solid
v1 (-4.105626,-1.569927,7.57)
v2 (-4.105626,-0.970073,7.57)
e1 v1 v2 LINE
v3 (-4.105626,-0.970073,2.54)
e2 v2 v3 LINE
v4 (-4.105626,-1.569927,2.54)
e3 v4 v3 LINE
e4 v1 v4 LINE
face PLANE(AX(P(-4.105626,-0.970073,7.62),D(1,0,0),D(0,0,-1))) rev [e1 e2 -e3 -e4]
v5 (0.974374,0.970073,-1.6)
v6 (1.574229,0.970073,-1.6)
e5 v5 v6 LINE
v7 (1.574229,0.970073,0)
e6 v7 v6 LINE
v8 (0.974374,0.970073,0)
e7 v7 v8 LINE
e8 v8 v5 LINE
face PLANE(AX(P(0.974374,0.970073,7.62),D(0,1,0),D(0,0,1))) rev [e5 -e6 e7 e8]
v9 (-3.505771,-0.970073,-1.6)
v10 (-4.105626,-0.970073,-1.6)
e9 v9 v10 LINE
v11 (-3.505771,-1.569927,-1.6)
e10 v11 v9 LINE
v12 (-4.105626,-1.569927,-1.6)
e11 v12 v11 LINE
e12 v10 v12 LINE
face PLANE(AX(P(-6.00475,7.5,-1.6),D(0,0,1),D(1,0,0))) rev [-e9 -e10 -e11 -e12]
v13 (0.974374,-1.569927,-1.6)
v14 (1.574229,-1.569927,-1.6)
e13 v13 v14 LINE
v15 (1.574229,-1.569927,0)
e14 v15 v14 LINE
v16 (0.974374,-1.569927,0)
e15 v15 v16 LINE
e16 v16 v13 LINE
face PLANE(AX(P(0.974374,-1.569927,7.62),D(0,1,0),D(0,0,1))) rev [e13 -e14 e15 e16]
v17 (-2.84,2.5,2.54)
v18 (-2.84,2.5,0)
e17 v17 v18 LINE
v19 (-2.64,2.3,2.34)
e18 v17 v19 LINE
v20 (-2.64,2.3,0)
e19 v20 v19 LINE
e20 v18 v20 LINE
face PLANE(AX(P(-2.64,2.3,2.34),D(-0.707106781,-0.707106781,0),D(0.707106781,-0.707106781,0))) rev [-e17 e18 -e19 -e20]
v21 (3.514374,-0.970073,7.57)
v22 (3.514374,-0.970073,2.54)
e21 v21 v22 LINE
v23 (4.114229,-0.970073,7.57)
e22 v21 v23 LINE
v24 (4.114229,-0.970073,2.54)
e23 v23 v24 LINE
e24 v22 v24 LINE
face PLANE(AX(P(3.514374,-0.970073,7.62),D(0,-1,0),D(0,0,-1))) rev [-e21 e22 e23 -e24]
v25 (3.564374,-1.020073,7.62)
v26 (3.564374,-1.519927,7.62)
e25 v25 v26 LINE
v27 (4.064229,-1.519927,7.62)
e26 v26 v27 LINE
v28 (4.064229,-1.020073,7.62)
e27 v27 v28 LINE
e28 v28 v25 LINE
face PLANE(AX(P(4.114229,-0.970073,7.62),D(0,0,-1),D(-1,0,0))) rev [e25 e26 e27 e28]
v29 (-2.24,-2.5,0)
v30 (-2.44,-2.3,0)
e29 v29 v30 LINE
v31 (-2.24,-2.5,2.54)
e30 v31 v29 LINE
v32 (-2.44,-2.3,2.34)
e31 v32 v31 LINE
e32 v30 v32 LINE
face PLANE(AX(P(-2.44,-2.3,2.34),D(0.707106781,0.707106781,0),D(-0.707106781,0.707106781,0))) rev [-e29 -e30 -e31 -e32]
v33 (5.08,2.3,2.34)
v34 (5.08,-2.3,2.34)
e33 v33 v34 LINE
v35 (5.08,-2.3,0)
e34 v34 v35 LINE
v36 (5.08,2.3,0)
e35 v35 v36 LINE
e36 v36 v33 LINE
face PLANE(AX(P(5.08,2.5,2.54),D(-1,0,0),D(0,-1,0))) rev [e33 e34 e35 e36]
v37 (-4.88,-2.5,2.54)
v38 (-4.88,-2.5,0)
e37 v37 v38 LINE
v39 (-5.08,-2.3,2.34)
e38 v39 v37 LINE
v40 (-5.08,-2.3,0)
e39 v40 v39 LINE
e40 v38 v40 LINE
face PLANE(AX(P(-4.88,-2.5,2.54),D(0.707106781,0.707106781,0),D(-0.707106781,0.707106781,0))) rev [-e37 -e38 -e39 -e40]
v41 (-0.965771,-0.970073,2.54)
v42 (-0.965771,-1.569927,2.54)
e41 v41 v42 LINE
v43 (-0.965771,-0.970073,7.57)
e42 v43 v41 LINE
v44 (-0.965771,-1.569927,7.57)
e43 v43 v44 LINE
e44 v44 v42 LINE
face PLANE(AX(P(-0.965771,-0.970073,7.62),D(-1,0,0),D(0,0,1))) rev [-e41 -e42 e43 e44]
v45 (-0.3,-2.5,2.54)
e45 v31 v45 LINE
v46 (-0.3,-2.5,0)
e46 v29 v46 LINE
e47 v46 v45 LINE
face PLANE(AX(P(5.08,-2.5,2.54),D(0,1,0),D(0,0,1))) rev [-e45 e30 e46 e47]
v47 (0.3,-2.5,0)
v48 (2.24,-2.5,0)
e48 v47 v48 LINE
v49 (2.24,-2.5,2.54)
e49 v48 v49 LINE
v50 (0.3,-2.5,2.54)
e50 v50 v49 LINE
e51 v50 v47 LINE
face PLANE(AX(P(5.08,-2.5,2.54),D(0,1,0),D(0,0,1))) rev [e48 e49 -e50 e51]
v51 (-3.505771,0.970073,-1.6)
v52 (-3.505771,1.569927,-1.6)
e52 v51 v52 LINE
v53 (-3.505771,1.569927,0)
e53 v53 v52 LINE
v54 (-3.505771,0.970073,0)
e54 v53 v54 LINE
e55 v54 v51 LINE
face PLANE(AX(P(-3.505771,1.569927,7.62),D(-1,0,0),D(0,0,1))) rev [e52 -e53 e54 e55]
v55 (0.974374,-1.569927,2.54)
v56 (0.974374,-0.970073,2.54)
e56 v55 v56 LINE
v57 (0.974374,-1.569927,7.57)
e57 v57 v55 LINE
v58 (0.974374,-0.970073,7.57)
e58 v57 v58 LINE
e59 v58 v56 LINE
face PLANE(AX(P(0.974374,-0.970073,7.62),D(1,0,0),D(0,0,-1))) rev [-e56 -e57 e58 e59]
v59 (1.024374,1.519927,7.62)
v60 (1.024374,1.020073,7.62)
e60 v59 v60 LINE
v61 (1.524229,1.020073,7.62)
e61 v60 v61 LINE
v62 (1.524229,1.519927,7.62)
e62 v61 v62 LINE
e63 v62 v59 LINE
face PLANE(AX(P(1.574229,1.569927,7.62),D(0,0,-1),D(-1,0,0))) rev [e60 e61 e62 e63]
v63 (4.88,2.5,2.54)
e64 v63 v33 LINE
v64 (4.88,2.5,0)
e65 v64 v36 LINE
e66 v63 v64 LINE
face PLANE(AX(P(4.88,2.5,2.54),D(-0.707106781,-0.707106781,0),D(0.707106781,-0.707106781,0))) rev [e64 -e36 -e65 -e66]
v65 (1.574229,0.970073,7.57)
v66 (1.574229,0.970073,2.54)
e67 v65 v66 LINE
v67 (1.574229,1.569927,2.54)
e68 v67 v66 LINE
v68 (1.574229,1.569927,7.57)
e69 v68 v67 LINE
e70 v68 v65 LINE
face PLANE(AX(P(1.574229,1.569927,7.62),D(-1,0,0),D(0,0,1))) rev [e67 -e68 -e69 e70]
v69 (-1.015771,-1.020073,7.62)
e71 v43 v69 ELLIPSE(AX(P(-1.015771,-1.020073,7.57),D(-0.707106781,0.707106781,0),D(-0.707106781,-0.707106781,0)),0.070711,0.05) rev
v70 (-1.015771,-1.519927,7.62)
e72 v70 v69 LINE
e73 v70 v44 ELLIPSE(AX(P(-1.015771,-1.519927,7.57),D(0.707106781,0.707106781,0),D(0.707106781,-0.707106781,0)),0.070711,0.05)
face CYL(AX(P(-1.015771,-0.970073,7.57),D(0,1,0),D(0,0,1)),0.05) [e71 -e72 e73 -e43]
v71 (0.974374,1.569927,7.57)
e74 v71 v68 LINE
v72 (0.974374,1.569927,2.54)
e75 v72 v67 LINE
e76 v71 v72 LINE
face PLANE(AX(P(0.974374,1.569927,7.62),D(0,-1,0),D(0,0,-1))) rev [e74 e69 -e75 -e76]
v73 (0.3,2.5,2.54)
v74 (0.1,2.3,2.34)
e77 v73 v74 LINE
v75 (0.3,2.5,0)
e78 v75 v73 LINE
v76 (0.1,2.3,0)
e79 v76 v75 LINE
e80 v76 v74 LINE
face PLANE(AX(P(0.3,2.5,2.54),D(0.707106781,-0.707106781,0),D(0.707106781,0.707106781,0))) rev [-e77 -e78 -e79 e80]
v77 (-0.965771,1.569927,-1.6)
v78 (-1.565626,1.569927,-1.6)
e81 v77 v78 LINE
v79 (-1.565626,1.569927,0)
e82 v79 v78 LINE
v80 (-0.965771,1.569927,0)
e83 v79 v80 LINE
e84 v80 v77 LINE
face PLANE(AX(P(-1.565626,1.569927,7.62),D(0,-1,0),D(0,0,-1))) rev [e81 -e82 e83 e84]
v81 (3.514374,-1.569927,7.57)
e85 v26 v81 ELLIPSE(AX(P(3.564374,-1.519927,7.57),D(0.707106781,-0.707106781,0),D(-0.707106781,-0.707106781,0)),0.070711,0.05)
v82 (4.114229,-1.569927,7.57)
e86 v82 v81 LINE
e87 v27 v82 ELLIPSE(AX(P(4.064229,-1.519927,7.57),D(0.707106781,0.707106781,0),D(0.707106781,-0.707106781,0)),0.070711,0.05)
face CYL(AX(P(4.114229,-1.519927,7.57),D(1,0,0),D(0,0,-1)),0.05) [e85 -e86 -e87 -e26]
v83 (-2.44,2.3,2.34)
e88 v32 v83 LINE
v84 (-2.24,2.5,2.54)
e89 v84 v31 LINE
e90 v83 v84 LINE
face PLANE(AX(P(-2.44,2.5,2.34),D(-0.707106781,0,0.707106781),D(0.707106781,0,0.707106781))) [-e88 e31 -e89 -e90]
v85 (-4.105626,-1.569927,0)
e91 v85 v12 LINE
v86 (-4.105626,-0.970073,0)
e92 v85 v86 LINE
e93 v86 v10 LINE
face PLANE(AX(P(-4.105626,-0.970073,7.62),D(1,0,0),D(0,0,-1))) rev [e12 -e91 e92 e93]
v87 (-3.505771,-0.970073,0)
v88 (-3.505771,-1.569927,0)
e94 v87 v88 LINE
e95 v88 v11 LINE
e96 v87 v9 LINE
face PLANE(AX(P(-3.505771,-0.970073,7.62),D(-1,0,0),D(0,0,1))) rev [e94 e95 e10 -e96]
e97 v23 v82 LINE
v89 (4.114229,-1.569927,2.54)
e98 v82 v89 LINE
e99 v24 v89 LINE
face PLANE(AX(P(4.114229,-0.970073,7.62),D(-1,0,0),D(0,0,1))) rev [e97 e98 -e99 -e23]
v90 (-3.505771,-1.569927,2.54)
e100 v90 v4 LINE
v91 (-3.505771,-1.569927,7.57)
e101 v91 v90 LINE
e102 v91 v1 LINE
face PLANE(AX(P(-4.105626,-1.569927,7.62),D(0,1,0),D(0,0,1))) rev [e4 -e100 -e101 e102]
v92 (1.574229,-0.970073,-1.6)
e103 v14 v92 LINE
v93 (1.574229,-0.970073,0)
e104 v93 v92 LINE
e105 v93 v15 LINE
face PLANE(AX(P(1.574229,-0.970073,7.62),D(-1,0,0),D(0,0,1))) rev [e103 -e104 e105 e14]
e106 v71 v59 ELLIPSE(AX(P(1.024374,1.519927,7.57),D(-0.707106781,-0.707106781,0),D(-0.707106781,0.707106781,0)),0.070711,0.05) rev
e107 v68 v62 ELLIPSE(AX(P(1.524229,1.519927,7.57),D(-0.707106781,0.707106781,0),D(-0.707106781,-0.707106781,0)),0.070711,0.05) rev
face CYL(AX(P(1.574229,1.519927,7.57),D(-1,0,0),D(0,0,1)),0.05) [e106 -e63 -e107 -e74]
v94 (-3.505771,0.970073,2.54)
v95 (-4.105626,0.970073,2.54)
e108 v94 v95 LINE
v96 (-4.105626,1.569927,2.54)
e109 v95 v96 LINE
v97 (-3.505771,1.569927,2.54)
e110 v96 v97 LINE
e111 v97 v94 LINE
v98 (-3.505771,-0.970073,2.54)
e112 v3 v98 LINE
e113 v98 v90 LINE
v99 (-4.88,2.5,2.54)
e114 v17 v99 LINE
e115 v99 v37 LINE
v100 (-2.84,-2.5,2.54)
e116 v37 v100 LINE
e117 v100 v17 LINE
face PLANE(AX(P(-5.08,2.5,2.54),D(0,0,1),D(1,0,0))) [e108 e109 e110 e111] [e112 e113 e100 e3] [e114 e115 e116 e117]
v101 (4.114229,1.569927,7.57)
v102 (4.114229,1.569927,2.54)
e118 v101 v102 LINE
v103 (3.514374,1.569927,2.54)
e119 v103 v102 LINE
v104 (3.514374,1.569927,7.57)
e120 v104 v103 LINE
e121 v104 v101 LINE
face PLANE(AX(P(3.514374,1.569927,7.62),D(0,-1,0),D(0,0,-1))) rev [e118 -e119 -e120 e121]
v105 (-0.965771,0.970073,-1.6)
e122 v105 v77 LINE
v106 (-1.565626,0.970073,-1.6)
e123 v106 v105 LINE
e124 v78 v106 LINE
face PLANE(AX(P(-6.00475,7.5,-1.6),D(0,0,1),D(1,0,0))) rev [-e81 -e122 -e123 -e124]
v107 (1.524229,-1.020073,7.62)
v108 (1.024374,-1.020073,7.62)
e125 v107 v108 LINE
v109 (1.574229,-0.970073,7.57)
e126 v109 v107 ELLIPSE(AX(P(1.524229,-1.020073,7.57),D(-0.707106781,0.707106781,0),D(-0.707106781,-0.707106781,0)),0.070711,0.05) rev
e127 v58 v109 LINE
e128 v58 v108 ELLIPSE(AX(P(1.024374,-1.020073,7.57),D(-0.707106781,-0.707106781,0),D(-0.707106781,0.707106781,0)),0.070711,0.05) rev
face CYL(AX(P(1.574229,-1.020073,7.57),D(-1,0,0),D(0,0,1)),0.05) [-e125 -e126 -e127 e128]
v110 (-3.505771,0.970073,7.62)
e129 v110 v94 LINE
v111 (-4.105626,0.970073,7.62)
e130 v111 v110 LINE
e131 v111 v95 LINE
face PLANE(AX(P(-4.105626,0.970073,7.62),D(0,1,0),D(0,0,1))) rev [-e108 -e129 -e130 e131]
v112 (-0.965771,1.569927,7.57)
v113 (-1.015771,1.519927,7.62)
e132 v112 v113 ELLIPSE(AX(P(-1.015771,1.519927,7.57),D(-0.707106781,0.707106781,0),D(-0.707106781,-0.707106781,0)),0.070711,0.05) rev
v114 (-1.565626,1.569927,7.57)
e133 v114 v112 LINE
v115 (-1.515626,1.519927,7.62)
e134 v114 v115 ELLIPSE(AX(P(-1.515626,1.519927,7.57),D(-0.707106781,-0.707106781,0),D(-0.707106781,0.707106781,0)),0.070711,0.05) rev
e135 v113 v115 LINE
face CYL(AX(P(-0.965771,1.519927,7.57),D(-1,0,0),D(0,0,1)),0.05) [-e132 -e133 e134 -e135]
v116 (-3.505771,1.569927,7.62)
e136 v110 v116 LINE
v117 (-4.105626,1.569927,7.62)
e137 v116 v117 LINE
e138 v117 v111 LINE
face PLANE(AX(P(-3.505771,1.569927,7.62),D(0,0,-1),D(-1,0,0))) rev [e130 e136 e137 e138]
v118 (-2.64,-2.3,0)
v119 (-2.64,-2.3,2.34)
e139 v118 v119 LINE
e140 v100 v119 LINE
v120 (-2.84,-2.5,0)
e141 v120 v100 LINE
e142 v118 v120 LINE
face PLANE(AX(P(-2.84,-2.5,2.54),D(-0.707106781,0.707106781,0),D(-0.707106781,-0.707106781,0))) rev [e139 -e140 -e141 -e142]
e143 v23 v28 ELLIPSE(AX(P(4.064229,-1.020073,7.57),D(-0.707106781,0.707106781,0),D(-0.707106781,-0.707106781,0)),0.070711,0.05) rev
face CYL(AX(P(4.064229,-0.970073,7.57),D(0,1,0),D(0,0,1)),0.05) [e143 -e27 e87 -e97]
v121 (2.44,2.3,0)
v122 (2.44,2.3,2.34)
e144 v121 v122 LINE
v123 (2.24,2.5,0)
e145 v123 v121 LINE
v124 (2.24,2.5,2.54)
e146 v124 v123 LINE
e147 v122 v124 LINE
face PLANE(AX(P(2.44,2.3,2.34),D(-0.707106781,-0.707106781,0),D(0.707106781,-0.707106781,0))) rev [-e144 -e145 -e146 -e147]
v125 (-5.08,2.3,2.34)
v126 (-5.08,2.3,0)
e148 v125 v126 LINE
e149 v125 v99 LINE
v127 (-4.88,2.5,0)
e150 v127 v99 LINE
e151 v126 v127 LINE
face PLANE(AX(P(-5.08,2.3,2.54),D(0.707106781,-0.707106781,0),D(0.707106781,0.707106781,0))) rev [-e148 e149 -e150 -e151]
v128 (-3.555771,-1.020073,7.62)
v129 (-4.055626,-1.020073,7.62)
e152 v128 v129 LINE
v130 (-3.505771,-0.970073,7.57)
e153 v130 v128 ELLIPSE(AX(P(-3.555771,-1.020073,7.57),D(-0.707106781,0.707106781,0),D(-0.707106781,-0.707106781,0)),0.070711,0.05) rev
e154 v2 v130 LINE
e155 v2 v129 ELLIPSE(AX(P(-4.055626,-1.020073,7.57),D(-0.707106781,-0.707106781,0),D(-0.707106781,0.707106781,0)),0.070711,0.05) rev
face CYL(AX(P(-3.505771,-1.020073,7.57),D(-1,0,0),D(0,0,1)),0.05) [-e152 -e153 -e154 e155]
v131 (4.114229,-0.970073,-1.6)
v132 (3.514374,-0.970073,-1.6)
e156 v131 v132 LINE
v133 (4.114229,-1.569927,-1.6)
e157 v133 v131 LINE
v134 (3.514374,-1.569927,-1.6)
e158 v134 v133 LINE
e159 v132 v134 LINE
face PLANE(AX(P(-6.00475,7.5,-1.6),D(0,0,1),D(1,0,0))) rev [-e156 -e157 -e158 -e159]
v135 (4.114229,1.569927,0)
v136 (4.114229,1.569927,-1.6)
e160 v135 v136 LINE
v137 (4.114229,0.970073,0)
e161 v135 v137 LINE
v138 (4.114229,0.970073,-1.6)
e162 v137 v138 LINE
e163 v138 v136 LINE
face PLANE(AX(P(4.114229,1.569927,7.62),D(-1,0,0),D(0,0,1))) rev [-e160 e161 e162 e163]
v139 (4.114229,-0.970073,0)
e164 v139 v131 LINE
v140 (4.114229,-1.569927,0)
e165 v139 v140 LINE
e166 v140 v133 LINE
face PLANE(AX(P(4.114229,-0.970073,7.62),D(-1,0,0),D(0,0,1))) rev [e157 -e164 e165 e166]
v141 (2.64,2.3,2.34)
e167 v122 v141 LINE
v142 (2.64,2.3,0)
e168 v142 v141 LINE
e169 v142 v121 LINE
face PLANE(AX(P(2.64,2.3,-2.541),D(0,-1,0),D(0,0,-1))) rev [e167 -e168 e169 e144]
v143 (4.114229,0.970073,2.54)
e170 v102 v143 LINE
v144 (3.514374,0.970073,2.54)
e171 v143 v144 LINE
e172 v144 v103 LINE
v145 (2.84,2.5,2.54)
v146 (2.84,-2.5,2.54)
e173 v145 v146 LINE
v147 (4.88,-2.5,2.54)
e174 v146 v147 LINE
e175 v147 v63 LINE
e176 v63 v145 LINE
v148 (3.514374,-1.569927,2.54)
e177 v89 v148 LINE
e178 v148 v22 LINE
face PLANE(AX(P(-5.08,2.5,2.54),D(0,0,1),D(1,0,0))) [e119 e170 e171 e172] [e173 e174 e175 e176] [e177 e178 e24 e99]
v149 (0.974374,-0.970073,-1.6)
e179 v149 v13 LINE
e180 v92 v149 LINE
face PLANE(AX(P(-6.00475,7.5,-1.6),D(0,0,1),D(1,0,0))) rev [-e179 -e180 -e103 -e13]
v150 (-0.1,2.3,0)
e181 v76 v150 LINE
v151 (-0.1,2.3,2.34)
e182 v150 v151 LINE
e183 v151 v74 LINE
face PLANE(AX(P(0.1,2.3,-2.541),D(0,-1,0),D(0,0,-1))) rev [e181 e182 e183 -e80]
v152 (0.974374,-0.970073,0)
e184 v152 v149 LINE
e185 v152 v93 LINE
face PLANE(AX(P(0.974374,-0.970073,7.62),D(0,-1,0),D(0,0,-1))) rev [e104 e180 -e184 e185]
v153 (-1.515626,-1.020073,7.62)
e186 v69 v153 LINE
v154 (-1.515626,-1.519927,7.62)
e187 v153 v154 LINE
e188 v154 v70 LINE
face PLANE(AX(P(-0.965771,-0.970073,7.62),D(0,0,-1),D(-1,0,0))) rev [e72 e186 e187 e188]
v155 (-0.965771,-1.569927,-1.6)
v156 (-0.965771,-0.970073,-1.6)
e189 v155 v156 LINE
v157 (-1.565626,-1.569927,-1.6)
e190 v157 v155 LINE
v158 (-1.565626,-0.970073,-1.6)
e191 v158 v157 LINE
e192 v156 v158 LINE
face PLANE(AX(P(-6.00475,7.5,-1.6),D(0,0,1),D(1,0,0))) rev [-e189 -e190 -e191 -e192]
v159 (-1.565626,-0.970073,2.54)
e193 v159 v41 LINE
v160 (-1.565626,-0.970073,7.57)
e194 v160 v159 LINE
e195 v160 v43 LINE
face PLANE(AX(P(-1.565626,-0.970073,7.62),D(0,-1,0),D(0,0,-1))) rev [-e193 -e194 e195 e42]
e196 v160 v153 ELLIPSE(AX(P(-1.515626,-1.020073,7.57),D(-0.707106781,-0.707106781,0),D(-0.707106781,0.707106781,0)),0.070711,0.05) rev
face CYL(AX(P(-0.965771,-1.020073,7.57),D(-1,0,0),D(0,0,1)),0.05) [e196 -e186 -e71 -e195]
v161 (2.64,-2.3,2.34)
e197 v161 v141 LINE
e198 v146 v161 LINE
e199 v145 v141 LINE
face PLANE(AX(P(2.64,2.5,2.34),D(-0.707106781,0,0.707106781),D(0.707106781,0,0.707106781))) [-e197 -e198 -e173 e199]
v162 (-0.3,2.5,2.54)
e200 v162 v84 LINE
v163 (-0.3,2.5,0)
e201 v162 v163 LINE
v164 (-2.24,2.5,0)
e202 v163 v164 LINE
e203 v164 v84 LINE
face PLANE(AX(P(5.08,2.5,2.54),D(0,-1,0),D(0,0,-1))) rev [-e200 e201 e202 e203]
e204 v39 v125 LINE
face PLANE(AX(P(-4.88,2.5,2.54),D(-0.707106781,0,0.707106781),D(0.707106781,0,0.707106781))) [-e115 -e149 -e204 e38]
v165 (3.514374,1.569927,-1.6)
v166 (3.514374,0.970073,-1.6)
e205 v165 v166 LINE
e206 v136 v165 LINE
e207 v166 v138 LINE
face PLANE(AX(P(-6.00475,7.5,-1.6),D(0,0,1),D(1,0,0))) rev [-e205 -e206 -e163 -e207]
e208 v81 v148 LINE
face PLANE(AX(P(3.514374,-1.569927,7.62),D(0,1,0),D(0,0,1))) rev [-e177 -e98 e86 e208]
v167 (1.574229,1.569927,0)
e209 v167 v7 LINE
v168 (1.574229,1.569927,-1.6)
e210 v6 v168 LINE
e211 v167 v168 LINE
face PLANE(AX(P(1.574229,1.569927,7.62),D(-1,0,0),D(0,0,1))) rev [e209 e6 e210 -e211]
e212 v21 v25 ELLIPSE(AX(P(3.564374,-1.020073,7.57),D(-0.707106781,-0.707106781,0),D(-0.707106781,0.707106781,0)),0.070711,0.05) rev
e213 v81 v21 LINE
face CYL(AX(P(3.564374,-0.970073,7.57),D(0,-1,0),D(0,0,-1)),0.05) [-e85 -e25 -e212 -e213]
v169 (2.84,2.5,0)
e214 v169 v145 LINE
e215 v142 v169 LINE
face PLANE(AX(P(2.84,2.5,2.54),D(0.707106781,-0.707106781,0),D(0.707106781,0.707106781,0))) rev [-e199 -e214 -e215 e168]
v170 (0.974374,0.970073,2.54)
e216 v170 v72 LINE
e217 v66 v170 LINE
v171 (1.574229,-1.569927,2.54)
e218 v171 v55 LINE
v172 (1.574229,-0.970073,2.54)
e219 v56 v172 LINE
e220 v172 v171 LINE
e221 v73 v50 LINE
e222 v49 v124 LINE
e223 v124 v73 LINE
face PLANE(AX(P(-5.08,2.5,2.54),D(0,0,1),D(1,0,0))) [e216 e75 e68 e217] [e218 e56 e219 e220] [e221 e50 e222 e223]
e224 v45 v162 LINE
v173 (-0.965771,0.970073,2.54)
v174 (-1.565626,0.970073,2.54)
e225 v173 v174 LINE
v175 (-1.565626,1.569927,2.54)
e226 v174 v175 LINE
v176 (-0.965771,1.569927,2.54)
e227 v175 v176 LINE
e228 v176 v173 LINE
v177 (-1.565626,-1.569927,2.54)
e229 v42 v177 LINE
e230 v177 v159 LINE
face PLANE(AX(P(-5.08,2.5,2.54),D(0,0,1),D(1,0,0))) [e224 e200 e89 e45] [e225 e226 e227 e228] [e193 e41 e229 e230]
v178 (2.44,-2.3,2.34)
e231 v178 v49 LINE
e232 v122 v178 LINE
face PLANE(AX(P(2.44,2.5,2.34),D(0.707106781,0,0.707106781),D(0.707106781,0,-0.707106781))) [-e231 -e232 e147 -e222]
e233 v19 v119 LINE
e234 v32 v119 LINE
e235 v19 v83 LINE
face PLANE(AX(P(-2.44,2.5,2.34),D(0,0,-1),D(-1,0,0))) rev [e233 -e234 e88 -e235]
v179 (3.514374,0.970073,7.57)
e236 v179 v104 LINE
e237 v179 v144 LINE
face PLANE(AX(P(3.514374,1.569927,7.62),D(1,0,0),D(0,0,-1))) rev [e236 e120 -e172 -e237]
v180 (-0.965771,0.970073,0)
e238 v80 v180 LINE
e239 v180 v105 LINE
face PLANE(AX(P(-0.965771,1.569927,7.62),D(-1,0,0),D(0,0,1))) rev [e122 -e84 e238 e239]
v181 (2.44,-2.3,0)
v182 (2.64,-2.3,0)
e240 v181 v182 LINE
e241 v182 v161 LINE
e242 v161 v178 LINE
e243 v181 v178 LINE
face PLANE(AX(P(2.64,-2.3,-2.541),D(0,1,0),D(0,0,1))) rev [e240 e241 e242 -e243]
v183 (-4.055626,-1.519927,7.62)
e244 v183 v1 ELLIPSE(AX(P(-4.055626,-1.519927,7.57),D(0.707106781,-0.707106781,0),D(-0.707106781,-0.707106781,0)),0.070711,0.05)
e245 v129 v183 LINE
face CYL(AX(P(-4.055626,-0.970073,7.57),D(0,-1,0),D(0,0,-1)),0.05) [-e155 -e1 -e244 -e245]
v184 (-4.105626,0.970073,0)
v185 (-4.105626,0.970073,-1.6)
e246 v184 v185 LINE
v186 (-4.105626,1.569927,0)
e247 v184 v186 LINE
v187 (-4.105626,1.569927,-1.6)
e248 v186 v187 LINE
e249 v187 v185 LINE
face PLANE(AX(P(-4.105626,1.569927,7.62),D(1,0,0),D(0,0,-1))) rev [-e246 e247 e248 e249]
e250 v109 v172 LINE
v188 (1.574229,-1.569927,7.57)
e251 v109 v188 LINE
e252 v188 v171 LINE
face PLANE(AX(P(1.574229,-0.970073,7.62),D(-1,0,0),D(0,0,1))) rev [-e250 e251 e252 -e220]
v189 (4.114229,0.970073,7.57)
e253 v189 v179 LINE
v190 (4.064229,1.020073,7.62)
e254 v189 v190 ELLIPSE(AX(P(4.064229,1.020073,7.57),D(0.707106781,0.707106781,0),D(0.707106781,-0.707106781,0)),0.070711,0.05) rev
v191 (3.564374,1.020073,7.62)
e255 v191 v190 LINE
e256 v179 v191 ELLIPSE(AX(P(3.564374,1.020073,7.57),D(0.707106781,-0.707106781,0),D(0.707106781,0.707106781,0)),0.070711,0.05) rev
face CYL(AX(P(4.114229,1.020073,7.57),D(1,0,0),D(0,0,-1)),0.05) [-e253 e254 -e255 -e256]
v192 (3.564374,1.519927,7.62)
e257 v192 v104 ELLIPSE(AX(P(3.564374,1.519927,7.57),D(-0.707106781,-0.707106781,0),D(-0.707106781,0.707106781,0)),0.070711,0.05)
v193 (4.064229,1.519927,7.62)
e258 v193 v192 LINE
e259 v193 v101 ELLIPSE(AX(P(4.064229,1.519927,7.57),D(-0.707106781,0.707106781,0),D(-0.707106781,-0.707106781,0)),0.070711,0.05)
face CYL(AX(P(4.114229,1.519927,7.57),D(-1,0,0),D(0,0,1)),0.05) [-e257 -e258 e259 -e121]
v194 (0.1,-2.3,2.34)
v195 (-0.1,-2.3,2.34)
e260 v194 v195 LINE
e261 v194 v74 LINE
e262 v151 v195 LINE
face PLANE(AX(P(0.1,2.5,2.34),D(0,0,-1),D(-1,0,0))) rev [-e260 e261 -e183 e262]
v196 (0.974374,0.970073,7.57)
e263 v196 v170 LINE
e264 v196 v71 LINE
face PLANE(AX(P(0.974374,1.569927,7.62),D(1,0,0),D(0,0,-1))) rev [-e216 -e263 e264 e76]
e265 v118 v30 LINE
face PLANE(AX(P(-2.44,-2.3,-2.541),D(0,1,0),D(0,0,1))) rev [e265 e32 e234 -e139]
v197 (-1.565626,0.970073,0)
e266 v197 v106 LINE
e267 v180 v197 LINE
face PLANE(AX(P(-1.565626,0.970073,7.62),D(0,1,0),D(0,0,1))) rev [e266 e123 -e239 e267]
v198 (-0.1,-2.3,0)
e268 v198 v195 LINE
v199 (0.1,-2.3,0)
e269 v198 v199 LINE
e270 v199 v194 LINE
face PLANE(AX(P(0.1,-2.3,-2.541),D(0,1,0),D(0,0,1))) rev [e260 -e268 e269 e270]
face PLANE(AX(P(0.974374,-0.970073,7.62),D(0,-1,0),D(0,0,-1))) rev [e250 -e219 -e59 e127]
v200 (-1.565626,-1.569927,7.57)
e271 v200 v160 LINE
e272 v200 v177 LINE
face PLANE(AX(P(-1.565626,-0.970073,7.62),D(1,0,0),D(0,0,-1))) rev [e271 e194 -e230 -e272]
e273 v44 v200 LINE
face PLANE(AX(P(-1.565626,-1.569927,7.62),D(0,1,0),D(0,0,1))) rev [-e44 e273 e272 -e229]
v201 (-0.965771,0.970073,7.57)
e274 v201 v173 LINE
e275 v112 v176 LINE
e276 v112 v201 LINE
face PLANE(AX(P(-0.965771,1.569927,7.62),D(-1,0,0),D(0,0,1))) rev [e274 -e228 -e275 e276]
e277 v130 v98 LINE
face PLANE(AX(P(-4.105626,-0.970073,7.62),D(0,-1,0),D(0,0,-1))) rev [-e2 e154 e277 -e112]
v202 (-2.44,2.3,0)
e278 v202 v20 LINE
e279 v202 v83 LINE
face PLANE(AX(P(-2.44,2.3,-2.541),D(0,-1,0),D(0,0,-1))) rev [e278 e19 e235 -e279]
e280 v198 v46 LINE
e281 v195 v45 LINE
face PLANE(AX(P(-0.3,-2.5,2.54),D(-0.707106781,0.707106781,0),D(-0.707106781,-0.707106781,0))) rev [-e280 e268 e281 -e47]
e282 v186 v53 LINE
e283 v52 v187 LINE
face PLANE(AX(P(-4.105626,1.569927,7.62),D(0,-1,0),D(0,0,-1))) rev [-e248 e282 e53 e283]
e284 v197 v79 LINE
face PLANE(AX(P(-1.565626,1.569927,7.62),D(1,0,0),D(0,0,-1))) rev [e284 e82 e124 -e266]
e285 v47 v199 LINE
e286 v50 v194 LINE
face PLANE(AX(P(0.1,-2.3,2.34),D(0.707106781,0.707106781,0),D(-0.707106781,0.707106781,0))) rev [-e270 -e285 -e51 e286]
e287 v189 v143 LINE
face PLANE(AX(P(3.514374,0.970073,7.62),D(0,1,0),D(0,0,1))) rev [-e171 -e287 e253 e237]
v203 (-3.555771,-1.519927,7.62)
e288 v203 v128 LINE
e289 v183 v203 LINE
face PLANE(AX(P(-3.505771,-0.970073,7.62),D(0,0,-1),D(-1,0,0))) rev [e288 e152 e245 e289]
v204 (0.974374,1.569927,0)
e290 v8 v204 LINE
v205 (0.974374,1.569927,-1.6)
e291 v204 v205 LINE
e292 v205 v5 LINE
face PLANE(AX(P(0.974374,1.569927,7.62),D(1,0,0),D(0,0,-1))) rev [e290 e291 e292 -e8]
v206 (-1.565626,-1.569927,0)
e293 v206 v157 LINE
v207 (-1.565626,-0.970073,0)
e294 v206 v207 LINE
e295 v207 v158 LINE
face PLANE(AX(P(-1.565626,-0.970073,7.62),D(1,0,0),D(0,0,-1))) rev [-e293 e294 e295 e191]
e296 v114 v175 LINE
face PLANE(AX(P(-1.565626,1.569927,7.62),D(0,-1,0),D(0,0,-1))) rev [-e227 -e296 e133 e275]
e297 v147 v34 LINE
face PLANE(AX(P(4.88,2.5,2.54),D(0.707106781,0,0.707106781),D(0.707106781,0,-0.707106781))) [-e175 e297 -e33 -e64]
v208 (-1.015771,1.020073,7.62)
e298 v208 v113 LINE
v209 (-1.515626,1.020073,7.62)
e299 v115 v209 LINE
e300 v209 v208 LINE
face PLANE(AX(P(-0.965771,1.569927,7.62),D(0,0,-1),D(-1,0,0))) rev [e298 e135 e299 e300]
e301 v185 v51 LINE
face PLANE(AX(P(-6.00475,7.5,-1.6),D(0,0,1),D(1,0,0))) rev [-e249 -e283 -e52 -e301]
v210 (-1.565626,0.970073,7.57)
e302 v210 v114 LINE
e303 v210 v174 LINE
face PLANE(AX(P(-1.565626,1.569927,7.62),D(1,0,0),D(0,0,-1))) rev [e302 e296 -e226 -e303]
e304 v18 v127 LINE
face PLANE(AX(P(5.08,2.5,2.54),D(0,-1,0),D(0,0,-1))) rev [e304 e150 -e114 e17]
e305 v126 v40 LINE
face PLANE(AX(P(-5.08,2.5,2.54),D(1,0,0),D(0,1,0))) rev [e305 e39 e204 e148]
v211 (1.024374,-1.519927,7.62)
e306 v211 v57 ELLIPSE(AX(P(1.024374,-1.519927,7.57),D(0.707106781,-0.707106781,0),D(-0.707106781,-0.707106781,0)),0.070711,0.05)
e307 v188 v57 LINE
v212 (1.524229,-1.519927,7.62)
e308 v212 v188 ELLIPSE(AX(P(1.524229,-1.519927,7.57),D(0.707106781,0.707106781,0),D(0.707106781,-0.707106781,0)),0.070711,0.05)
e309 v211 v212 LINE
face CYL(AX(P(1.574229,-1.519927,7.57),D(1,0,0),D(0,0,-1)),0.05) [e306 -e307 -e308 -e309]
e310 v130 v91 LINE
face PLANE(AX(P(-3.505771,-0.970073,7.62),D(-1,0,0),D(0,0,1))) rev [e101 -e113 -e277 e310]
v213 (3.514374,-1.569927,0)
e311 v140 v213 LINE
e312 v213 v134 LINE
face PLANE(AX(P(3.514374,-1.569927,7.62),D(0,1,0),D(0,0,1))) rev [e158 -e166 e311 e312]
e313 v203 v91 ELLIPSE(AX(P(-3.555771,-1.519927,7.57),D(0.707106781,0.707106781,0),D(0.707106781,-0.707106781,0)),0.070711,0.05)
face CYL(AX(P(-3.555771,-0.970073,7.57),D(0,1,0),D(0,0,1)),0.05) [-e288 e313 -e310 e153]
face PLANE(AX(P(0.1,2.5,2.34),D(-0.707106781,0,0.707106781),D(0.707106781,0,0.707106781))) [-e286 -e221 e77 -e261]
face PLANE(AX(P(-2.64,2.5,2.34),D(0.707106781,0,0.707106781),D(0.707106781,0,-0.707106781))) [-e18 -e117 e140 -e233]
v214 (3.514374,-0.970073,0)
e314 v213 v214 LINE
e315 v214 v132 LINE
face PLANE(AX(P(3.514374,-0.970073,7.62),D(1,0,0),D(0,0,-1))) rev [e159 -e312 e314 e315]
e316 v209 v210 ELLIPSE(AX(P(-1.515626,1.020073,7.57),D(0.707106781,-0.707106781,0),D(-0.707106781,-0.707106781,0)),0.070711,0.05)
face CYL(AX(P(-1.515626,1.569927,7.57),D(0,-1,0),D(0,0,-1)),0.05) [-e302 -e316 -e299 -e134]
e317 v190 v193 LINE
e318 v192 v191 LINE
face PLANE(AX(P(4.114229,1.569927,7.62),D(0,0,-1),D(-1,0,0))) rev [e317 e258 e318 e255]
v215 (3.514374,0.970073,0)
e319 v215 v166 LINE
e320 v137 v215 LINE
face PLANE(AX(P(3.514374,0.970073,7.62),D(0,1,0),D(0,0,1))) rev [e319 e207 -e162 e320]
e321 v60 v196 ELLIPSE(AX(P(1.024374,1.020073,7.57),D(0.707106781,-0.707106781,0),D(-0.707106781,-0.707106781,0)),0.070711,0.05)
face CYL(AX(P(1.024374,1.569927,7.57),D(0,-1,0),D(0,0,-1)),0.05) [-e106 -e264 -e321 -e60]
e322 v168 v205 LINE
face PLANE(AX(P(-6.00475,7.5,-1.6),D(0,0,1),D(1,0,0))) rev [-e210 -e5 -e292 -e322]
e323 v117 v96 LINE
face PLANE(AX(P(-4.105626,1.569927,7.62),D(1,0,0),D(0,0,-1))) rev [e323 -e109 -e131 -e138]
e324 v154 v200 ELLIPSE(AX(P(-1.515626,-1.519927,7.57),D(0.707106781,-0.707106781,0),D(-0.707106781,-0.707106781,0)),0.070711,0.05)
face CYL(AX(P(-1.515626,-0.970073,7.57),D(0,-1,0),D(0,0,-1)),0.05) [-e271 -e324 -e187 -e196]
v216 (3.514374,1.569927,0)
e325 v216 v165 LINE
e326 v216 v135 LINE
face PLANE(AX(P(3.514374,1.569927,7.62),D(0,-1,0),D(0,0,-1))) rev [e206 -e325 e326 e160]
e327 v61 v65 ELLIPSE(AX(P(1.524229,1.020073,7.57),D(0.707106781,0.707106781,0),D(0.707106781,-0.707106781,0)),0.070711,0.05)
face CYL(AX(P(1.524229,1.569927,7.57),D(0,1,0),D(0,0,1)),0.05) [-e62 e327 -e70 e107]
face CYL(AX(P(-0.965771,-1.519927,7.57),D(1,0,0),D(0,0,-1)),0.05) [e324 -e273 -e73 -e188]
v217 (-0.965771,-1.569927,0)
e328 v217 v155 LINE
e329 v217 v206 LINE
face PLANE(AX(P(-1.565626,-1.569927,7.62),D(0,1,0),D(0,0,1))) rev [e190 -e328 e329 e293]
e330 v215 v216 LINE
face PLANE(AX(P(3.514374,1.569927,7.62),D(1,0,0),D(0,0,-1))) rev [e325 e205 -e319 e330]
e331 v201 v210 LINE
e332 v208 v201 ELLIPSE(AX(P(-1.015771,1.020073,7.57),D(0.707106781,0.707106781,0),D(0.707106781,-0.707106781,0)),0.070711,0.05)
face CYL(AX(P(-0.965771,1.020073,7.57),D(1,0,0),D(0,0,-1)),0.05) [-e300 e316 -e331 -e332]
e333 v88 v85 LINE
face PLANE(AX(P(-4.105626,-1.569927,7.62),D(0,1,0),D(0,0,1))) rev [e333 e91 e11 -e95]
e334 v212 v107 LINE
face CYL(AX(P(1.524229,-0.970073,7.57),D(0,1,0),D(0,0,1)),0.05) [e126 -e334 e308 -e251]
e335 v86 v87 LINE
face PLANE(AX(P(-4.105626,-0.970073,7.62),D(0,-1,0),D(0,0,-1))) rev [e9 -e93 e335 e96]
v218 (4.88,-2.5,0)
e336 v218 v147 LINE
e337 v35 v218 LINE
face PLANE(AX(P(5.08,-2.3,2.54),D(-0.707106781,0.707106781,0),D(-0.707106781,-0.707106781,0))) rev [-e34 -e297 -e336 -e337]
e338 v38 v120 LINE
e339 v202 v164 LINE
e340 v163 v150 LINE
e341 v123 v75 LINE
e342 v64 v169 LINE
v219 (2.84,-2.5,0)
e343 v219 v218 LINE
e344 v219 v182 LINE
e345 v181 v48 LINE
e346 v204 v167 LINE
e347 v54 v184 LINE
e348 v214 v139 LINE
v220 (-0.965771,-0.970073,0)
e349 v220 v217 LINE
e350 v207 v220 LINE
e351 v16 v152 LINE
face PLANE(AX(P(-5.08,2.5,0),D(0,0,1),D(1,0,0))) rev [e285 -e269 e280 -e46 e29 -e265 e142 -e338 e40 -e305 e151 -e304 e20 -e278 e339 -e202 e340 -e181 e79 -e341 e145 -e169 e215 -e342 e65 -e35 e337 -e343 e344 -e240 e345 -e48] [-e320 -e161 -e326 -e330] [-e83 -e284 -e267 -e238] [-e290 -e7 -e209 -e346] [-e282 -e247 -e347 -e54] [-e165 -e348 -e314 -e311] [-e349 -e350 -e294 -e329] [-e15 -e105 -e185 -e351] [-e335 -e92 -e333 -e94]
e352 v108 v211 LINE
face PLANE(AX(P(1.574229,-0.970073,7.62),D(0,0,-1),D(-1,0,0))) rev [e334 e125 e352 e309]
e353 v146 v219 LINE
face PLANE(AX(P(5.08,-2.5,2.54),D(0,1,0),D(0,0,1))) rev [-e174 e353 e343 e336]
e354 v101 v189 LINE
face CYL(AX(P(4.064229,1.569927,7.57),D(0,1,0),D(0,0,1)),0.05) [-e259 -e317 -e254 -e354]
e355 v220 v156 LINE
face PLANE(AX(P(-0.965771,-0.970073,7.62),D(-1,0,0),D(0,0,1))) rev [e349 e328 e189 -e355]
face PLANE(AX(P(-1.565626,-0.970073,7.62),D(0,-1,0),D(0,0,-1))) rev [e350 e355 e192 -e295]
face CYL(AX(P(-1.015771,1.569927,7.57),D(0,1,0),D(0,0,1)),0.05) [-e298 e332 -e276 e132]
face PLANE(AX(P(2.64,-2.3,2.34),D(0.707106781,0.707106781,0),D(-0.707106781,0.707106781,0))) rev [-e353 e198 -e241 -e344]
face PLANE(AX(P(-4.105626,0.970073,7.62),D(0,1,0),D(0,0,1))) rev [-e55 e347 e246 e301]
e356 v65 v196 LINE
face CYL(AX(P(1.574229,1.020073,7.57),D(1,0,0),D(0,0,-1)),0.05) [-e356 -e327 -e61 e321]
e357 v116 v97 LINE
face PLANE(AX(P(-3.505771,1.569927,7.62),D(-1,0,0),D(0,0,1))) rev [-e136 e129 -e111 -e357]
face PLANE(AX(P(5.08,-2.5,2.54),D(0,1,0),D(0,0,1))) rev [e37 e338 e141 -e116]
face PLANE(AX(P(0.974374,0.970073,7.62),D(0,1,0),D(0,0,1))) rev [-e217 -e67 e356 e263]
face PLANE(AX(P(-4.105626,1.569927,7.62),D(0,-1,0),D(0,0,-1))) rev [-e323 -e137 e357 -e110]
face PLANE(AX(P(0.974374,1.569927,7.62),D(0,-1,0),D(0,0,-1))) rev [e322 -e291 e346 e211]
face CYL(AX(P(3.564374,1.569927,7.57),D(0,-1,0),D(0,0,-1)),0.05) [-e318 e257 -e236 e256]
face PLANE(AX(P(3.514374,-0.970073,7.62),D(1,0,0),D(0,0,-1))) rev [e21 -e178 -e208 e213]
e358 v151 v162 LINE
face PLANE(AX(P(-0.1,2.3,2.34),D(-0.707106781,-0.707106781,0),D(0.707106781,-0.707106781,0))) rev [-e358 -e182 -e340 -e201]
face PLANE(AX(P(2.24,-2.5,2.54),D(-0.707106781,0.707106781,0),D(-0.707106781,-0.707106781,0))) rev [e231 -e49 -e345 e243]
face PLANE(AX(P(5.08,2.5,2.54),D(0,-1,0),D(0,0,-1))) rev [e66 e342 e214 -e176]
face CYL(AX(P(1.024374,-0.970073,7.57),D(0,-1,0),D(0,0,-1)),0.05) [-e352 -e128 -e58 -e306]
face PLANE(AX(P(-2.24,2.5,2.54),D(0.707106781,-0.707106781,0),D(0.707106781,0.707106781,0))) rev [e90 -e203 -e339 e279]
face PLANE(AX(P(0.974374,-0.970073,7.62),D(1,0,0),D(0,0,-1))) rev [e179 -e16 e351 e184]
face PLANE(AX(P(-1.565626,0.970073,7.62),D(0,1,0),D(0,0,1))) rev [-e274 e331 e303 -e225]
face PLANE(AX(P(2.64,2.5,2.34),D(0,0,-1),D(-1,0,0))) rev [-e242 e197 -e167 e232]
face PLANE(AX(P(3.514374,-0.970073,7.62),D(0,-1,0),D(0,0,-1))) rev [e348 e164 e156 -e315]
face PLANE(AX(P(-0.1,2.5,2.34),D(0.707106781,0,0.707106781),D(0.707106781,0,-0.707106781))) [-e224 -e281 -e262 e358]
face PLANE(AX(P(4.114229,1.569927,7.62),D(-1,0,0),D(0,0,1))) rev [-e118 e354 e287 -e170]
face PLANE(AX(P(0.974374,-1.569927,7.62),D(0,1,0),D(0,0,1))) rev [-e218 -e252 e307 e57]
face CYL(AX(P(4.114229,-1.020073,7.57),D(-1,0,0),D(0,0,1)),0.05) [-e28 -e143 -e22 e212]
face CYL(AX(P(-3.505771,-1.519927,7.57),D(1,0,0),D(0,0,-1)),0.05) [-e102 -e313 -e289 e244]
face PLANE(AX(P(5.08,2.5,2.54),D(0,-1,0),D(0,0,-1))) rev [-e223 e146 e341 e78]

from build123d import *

# Parameters (mm, degrees)
EXTRUDE_1_DEPTH             = 2.54
SKETCH_2_W                  = 0.599854391
SKETCH_2_H                  = 0.599854392
EXTRUDE_2_DEPTH             = 5.08
SKETCH_4_W                  = 0.2
SKETCH_4_H                  = 5
CUT_EXTRUDE_2_DEPTH         = 0.2
CUT_EXTRUDE_3_REACH         = 9.607
SKETCH_5_W                  = 0.2
SKETCH_5_H                  = 0.2
PATTERN_LINEAR_2_COUNT      = 3
PATTERN_LINEAR_2_PITCH      = 2.54
CHAMFER_1_SIZE              = 0.2
CHAMFER_2_SIZE              = 0.2
PATTERN_LINEAR_3_COUNT      = 4
PATTERN_LINEAR_3_PITCH      = 2.54
PATTERN_LINEAR_3_COUNT_DIR2 = 2
PATTERN_LINEAR_3_PITCH_DIR2 = 2.54
FILLET_4_R                  = 0.05
SKETCH_6_W                  = 13.31877373
SKETCH_6_H                  = 4.876948745
CUT_EXTRUDE_4_DEPTH         = 10


with BuildPart() as part:
    # 草图1 → 凸台-拉伸1 (new body)
    with BuildSketch(Plane.XY):
        Polygon((5.08, 2.5), (-5.08, 2.5), (-5.08, 0), (-5.08, -2.5), (5.08, -2.5), (5.08, 0), align=None)
    extrude(amount=EXTRUDE_1_DEPTH)

    # 草图2 → 凸台-拉伸2 (add, symmetric)
    with BuildSketch(Plane.XY.offset(2.54)):
        with Locations((-3.805698419, 1.27)):
            Rectangle(SKETCH_2_W, SKETCH_2_H)
    extrude_2 = extrude(amount=EXTRUDE_2_DEPTH, both=True)

    # 草图4 → 切除-拉伸2 (cut)
    with BuildSketch(Plane.XY.offset(2.54)):
        with Locations((-2.54, 0)):
            Rectangle(SKETCH_4_W, SKETCH_4_H)
    cut_extrude_2 = extrude(amount=-CUT_EXTRUDE_2_DEPTH, mode=Mode.SUBTRACT)

    # 草图5 → 切除-拉伸3 (cut, up to next)
    with BuildSketch(Plane.XY.offset(2.54), mode=Mode.PRIVATE) as cut_extrude_3_sk1:
        with Locations((-2.54, 2.4)):
            Rectangle(SKETCH_5_W, SKETCH_5_H)
    cut_extrude_3_tool1 = extrude(cut_extrude_3_sk1.sketch, amount=-CUT_EXTRUDE_3_REACH, mode=Mode.PRIVATE) & part.part
    # 草图5 → 切除-拉伸3 (cut, up to next)
    with BuildSketch(Plane.XY.offset(2.54), mode=Mode.PRIVATE) as cut_extrude_3_sk2:
        with Locations((-2.54, -2.4)):
            Rectangle(SKETCH_5_W, SKETCH_5_H)
    cut_extrude_3_tool2 = extrude(cut_extrude_3_sk2.sketch, amount=-CUT_EXTRUDE_3_REACH, mode=Mode.PRIVATE) & part.part
    cut_extrude_3_1 = cut_extrude_3_tool1.solids().sort_by_distance((-2.54, 2.4, 2.54))[0]
    add(cut_extrude_3_1, mode=Mode.SUBTRACT)
    cut_extrude_3_2 = cut_extrude_3_tool2.solids().sort_by_distance((-2.54, -2.4, 2.54))[0]
    add(cut_extrude_3_2, mode=Mode.SUBTRACT)
    cut_extrude_3 = cut_extrude_3_1 + cut_extrude_3_2  # 切除-拉伸3 as one shape, for the pattern or mirror that repeats it

    # 阵列(线性)2: 切除-拉伸2, 切除-拉伸3 ×3
    with Locations(*[(i * PATTERN_LINEAR_2_PITCH, 0, 0) for i in range(1, PATTERN_LINEAR_2_COUNT)]):
        add(cut_extrude_2, mode=Mode.SUBTRACT)
        add(cut_extrude_3, mode=Mode.SUBTRACT)

    # 倒角1
    chamfer_1_edges = [part.edges().sort_by_distance(p)[0] for p in [
        (5.08, -1.25, 2.54),
        (-5.08, 2.5, 1.27),
        (5.08, 2.5, 1.27),
        (5.08, -2.5, 1.27),
        (-5.08, -2.5, 1.27),
        (-5.08, -1.25, 2.54),
    ]]
    chamfer(chamfer_1_edges, length=CHAMFER_1_SIZE)

    # 倒角2
    chamfer_2_edges = [part.edges().sort_by_distance(p)[0] for p in [
        (-2.64, -2.5, 1.27),
        (2.44, -2.5, 1.27),
        (0.1, -2.5, 1.27),
        (2.64, -2.5, 1.27),
        (-0.1, -2.5, 1.27),
        (-2.44, -2.5, 1.27),
        (2.64, 0, 2.54),
        (-2.64, 0, 2.54),
        (-0.1, 0, 2.54),
        (-2.44, 0, 2.54),
        (2.44, 0, 2.54),
        (0.1, 0, 2.54),
        (2.64, 2.5, 1.27),
        (-0.1, 2.5, 1.27),
        (-2.44, 2.5, 1.27),
        (2.44, 2.5, 1.27),
        (0.1, 2.5, 1.27),
        (-2.64, 2.5, 1.27),
    ]]
    chamfer(chamfer_2_edges, length=CHAMFER_2_SIZE - 0.0001)  # a hair under: the kernel refuses the full size

    # 阵列(线性)3: Extrude 2 4 × 2
    with Locations(*[(i * PATTERN_LINEAR_3_PITCH, -j * PATTERN_LINEAR_3_PITCH_DIR2, 0) for i in range(PATTERN_LINEAR_3_COUNT) for j in range(PATTERN_LINEAR_3_COUNT_DIR2) if (i, j) != (0, 0)]):
        add(extrude_2)

    # 圆角4
    fillet_4_edges = [part.edges().sort_by_distance(p)[0] for p in [
        (-3.805698419, -0.970072804, -2.54),
        (-4.105625614, -1.27, -2.54),
        (-3.805698419, -1.569927196, -2.54),
        (-3.505771223, -1.27, -2.54),
        (-3.805698419, -0.970072804, 7.62),
        (-4.105625614, -1.27, 7.62),
        (-3.805698419, -1.569927196, 7.62),
        (-3.505771223, -1.27, 7.62),
        (-1.265698419, 1.569927196, -2.54),
        (-1.565625614, 1.27, -2.54),
        (-1.265698419, 0.970072804, -2.54),
        (-0.965771223, 1.27, -2.54),
        (-1.265698419, 1.569927196, 7.62),
        (-1.565625614, 1.27, 7.62),
        (-1.265698419, 0.970072804, 7.62),
        (-0.965771223, 1.27, 7.62),
        (-1.265698419, -0.970072804, -2.54),
        (-1.565625614, -1.27, -2.54),
        (-1.265698419, -1.569927196, -2.54),
        (-0.965771223, -1.27, -2.54),
        (-1.265698419, -0.970072804, 7.62),
        (-1.565625614, -1.27, 7.62),
        (-1.265698419, -1.569927196, 7.62),
        (-0.965771223, -1.27, 7.62),
        (1.274301581, 1.569927196, -2.54),
        (0.974374386, 1.27, -2.54),
        (1.274301581, 0.970072804, -2.54),
        (1.574228777, 1.27, -2.54),
        (1.274301581, 1.569927196, 7.62),
        (0.974374386, 1.27, 7.62),
        (1.274301581, 0.970072804, 7.62),
        (1.574228777, 1.27, 7.62),
        (1.274301581, -0.970072804, -2.54),
        (0.974374386, -1.27, -2.54),
        (1.274301581, -1.569927196, -2.54),
        (1.574228777, -1.27, -2.54),
        (1.274301581, -0.970072804, 7.62),
        (0.974374386, -1.27, 7.62),
        (1.274301581, -1.569927196, 7.62),
        (1.574228777, -1.27, 7.62),
        (3.814301581, 1.569927196, -2.54),
        (3.514374386, 1.27, -2.54),
        (3.814301581, 0.970072804, -2.54),
        (4.114228777, 1.27, -2.54),
        (3.814301581, 1.569927196, 7.62),
        (3.514374386, 1.27, 7.62),
        (3.814301581, 0.970072804, 7.62),
        (4.114228777, 1.27, 7.62),
        (3.814301581, -0.970072804, -2.54),
        (3.514374386, -1.27, -2.54),
        (3.814301581, -1.569927196, -2.54),
        (4.114228777, -1.27, -2.54),
        (3.814301581, -0.970072804, 7.62),
        (3.514374386, -1.27, 7.62),
        (3.814301581, -1.569927196, 7.62),
        (4.114228777, -1.27, 7.62),
    ]]
    fillet(fillet_4_edges, radius=FILLET_4_R)

    # 草图6 → 切除-拉伸4 (cut)
    with BuildSketch(Plane.XZ.offset(2.5)):
        with Locations((0.654637262, -4.038474373)):
            Rectangle(SKETCH_6_W, SKETCH_6_H)
    extrude(amount=-CUT_EXTRUDE_4_DEPTH, mode=Mode.SUBTRACT)


solid = part.part
